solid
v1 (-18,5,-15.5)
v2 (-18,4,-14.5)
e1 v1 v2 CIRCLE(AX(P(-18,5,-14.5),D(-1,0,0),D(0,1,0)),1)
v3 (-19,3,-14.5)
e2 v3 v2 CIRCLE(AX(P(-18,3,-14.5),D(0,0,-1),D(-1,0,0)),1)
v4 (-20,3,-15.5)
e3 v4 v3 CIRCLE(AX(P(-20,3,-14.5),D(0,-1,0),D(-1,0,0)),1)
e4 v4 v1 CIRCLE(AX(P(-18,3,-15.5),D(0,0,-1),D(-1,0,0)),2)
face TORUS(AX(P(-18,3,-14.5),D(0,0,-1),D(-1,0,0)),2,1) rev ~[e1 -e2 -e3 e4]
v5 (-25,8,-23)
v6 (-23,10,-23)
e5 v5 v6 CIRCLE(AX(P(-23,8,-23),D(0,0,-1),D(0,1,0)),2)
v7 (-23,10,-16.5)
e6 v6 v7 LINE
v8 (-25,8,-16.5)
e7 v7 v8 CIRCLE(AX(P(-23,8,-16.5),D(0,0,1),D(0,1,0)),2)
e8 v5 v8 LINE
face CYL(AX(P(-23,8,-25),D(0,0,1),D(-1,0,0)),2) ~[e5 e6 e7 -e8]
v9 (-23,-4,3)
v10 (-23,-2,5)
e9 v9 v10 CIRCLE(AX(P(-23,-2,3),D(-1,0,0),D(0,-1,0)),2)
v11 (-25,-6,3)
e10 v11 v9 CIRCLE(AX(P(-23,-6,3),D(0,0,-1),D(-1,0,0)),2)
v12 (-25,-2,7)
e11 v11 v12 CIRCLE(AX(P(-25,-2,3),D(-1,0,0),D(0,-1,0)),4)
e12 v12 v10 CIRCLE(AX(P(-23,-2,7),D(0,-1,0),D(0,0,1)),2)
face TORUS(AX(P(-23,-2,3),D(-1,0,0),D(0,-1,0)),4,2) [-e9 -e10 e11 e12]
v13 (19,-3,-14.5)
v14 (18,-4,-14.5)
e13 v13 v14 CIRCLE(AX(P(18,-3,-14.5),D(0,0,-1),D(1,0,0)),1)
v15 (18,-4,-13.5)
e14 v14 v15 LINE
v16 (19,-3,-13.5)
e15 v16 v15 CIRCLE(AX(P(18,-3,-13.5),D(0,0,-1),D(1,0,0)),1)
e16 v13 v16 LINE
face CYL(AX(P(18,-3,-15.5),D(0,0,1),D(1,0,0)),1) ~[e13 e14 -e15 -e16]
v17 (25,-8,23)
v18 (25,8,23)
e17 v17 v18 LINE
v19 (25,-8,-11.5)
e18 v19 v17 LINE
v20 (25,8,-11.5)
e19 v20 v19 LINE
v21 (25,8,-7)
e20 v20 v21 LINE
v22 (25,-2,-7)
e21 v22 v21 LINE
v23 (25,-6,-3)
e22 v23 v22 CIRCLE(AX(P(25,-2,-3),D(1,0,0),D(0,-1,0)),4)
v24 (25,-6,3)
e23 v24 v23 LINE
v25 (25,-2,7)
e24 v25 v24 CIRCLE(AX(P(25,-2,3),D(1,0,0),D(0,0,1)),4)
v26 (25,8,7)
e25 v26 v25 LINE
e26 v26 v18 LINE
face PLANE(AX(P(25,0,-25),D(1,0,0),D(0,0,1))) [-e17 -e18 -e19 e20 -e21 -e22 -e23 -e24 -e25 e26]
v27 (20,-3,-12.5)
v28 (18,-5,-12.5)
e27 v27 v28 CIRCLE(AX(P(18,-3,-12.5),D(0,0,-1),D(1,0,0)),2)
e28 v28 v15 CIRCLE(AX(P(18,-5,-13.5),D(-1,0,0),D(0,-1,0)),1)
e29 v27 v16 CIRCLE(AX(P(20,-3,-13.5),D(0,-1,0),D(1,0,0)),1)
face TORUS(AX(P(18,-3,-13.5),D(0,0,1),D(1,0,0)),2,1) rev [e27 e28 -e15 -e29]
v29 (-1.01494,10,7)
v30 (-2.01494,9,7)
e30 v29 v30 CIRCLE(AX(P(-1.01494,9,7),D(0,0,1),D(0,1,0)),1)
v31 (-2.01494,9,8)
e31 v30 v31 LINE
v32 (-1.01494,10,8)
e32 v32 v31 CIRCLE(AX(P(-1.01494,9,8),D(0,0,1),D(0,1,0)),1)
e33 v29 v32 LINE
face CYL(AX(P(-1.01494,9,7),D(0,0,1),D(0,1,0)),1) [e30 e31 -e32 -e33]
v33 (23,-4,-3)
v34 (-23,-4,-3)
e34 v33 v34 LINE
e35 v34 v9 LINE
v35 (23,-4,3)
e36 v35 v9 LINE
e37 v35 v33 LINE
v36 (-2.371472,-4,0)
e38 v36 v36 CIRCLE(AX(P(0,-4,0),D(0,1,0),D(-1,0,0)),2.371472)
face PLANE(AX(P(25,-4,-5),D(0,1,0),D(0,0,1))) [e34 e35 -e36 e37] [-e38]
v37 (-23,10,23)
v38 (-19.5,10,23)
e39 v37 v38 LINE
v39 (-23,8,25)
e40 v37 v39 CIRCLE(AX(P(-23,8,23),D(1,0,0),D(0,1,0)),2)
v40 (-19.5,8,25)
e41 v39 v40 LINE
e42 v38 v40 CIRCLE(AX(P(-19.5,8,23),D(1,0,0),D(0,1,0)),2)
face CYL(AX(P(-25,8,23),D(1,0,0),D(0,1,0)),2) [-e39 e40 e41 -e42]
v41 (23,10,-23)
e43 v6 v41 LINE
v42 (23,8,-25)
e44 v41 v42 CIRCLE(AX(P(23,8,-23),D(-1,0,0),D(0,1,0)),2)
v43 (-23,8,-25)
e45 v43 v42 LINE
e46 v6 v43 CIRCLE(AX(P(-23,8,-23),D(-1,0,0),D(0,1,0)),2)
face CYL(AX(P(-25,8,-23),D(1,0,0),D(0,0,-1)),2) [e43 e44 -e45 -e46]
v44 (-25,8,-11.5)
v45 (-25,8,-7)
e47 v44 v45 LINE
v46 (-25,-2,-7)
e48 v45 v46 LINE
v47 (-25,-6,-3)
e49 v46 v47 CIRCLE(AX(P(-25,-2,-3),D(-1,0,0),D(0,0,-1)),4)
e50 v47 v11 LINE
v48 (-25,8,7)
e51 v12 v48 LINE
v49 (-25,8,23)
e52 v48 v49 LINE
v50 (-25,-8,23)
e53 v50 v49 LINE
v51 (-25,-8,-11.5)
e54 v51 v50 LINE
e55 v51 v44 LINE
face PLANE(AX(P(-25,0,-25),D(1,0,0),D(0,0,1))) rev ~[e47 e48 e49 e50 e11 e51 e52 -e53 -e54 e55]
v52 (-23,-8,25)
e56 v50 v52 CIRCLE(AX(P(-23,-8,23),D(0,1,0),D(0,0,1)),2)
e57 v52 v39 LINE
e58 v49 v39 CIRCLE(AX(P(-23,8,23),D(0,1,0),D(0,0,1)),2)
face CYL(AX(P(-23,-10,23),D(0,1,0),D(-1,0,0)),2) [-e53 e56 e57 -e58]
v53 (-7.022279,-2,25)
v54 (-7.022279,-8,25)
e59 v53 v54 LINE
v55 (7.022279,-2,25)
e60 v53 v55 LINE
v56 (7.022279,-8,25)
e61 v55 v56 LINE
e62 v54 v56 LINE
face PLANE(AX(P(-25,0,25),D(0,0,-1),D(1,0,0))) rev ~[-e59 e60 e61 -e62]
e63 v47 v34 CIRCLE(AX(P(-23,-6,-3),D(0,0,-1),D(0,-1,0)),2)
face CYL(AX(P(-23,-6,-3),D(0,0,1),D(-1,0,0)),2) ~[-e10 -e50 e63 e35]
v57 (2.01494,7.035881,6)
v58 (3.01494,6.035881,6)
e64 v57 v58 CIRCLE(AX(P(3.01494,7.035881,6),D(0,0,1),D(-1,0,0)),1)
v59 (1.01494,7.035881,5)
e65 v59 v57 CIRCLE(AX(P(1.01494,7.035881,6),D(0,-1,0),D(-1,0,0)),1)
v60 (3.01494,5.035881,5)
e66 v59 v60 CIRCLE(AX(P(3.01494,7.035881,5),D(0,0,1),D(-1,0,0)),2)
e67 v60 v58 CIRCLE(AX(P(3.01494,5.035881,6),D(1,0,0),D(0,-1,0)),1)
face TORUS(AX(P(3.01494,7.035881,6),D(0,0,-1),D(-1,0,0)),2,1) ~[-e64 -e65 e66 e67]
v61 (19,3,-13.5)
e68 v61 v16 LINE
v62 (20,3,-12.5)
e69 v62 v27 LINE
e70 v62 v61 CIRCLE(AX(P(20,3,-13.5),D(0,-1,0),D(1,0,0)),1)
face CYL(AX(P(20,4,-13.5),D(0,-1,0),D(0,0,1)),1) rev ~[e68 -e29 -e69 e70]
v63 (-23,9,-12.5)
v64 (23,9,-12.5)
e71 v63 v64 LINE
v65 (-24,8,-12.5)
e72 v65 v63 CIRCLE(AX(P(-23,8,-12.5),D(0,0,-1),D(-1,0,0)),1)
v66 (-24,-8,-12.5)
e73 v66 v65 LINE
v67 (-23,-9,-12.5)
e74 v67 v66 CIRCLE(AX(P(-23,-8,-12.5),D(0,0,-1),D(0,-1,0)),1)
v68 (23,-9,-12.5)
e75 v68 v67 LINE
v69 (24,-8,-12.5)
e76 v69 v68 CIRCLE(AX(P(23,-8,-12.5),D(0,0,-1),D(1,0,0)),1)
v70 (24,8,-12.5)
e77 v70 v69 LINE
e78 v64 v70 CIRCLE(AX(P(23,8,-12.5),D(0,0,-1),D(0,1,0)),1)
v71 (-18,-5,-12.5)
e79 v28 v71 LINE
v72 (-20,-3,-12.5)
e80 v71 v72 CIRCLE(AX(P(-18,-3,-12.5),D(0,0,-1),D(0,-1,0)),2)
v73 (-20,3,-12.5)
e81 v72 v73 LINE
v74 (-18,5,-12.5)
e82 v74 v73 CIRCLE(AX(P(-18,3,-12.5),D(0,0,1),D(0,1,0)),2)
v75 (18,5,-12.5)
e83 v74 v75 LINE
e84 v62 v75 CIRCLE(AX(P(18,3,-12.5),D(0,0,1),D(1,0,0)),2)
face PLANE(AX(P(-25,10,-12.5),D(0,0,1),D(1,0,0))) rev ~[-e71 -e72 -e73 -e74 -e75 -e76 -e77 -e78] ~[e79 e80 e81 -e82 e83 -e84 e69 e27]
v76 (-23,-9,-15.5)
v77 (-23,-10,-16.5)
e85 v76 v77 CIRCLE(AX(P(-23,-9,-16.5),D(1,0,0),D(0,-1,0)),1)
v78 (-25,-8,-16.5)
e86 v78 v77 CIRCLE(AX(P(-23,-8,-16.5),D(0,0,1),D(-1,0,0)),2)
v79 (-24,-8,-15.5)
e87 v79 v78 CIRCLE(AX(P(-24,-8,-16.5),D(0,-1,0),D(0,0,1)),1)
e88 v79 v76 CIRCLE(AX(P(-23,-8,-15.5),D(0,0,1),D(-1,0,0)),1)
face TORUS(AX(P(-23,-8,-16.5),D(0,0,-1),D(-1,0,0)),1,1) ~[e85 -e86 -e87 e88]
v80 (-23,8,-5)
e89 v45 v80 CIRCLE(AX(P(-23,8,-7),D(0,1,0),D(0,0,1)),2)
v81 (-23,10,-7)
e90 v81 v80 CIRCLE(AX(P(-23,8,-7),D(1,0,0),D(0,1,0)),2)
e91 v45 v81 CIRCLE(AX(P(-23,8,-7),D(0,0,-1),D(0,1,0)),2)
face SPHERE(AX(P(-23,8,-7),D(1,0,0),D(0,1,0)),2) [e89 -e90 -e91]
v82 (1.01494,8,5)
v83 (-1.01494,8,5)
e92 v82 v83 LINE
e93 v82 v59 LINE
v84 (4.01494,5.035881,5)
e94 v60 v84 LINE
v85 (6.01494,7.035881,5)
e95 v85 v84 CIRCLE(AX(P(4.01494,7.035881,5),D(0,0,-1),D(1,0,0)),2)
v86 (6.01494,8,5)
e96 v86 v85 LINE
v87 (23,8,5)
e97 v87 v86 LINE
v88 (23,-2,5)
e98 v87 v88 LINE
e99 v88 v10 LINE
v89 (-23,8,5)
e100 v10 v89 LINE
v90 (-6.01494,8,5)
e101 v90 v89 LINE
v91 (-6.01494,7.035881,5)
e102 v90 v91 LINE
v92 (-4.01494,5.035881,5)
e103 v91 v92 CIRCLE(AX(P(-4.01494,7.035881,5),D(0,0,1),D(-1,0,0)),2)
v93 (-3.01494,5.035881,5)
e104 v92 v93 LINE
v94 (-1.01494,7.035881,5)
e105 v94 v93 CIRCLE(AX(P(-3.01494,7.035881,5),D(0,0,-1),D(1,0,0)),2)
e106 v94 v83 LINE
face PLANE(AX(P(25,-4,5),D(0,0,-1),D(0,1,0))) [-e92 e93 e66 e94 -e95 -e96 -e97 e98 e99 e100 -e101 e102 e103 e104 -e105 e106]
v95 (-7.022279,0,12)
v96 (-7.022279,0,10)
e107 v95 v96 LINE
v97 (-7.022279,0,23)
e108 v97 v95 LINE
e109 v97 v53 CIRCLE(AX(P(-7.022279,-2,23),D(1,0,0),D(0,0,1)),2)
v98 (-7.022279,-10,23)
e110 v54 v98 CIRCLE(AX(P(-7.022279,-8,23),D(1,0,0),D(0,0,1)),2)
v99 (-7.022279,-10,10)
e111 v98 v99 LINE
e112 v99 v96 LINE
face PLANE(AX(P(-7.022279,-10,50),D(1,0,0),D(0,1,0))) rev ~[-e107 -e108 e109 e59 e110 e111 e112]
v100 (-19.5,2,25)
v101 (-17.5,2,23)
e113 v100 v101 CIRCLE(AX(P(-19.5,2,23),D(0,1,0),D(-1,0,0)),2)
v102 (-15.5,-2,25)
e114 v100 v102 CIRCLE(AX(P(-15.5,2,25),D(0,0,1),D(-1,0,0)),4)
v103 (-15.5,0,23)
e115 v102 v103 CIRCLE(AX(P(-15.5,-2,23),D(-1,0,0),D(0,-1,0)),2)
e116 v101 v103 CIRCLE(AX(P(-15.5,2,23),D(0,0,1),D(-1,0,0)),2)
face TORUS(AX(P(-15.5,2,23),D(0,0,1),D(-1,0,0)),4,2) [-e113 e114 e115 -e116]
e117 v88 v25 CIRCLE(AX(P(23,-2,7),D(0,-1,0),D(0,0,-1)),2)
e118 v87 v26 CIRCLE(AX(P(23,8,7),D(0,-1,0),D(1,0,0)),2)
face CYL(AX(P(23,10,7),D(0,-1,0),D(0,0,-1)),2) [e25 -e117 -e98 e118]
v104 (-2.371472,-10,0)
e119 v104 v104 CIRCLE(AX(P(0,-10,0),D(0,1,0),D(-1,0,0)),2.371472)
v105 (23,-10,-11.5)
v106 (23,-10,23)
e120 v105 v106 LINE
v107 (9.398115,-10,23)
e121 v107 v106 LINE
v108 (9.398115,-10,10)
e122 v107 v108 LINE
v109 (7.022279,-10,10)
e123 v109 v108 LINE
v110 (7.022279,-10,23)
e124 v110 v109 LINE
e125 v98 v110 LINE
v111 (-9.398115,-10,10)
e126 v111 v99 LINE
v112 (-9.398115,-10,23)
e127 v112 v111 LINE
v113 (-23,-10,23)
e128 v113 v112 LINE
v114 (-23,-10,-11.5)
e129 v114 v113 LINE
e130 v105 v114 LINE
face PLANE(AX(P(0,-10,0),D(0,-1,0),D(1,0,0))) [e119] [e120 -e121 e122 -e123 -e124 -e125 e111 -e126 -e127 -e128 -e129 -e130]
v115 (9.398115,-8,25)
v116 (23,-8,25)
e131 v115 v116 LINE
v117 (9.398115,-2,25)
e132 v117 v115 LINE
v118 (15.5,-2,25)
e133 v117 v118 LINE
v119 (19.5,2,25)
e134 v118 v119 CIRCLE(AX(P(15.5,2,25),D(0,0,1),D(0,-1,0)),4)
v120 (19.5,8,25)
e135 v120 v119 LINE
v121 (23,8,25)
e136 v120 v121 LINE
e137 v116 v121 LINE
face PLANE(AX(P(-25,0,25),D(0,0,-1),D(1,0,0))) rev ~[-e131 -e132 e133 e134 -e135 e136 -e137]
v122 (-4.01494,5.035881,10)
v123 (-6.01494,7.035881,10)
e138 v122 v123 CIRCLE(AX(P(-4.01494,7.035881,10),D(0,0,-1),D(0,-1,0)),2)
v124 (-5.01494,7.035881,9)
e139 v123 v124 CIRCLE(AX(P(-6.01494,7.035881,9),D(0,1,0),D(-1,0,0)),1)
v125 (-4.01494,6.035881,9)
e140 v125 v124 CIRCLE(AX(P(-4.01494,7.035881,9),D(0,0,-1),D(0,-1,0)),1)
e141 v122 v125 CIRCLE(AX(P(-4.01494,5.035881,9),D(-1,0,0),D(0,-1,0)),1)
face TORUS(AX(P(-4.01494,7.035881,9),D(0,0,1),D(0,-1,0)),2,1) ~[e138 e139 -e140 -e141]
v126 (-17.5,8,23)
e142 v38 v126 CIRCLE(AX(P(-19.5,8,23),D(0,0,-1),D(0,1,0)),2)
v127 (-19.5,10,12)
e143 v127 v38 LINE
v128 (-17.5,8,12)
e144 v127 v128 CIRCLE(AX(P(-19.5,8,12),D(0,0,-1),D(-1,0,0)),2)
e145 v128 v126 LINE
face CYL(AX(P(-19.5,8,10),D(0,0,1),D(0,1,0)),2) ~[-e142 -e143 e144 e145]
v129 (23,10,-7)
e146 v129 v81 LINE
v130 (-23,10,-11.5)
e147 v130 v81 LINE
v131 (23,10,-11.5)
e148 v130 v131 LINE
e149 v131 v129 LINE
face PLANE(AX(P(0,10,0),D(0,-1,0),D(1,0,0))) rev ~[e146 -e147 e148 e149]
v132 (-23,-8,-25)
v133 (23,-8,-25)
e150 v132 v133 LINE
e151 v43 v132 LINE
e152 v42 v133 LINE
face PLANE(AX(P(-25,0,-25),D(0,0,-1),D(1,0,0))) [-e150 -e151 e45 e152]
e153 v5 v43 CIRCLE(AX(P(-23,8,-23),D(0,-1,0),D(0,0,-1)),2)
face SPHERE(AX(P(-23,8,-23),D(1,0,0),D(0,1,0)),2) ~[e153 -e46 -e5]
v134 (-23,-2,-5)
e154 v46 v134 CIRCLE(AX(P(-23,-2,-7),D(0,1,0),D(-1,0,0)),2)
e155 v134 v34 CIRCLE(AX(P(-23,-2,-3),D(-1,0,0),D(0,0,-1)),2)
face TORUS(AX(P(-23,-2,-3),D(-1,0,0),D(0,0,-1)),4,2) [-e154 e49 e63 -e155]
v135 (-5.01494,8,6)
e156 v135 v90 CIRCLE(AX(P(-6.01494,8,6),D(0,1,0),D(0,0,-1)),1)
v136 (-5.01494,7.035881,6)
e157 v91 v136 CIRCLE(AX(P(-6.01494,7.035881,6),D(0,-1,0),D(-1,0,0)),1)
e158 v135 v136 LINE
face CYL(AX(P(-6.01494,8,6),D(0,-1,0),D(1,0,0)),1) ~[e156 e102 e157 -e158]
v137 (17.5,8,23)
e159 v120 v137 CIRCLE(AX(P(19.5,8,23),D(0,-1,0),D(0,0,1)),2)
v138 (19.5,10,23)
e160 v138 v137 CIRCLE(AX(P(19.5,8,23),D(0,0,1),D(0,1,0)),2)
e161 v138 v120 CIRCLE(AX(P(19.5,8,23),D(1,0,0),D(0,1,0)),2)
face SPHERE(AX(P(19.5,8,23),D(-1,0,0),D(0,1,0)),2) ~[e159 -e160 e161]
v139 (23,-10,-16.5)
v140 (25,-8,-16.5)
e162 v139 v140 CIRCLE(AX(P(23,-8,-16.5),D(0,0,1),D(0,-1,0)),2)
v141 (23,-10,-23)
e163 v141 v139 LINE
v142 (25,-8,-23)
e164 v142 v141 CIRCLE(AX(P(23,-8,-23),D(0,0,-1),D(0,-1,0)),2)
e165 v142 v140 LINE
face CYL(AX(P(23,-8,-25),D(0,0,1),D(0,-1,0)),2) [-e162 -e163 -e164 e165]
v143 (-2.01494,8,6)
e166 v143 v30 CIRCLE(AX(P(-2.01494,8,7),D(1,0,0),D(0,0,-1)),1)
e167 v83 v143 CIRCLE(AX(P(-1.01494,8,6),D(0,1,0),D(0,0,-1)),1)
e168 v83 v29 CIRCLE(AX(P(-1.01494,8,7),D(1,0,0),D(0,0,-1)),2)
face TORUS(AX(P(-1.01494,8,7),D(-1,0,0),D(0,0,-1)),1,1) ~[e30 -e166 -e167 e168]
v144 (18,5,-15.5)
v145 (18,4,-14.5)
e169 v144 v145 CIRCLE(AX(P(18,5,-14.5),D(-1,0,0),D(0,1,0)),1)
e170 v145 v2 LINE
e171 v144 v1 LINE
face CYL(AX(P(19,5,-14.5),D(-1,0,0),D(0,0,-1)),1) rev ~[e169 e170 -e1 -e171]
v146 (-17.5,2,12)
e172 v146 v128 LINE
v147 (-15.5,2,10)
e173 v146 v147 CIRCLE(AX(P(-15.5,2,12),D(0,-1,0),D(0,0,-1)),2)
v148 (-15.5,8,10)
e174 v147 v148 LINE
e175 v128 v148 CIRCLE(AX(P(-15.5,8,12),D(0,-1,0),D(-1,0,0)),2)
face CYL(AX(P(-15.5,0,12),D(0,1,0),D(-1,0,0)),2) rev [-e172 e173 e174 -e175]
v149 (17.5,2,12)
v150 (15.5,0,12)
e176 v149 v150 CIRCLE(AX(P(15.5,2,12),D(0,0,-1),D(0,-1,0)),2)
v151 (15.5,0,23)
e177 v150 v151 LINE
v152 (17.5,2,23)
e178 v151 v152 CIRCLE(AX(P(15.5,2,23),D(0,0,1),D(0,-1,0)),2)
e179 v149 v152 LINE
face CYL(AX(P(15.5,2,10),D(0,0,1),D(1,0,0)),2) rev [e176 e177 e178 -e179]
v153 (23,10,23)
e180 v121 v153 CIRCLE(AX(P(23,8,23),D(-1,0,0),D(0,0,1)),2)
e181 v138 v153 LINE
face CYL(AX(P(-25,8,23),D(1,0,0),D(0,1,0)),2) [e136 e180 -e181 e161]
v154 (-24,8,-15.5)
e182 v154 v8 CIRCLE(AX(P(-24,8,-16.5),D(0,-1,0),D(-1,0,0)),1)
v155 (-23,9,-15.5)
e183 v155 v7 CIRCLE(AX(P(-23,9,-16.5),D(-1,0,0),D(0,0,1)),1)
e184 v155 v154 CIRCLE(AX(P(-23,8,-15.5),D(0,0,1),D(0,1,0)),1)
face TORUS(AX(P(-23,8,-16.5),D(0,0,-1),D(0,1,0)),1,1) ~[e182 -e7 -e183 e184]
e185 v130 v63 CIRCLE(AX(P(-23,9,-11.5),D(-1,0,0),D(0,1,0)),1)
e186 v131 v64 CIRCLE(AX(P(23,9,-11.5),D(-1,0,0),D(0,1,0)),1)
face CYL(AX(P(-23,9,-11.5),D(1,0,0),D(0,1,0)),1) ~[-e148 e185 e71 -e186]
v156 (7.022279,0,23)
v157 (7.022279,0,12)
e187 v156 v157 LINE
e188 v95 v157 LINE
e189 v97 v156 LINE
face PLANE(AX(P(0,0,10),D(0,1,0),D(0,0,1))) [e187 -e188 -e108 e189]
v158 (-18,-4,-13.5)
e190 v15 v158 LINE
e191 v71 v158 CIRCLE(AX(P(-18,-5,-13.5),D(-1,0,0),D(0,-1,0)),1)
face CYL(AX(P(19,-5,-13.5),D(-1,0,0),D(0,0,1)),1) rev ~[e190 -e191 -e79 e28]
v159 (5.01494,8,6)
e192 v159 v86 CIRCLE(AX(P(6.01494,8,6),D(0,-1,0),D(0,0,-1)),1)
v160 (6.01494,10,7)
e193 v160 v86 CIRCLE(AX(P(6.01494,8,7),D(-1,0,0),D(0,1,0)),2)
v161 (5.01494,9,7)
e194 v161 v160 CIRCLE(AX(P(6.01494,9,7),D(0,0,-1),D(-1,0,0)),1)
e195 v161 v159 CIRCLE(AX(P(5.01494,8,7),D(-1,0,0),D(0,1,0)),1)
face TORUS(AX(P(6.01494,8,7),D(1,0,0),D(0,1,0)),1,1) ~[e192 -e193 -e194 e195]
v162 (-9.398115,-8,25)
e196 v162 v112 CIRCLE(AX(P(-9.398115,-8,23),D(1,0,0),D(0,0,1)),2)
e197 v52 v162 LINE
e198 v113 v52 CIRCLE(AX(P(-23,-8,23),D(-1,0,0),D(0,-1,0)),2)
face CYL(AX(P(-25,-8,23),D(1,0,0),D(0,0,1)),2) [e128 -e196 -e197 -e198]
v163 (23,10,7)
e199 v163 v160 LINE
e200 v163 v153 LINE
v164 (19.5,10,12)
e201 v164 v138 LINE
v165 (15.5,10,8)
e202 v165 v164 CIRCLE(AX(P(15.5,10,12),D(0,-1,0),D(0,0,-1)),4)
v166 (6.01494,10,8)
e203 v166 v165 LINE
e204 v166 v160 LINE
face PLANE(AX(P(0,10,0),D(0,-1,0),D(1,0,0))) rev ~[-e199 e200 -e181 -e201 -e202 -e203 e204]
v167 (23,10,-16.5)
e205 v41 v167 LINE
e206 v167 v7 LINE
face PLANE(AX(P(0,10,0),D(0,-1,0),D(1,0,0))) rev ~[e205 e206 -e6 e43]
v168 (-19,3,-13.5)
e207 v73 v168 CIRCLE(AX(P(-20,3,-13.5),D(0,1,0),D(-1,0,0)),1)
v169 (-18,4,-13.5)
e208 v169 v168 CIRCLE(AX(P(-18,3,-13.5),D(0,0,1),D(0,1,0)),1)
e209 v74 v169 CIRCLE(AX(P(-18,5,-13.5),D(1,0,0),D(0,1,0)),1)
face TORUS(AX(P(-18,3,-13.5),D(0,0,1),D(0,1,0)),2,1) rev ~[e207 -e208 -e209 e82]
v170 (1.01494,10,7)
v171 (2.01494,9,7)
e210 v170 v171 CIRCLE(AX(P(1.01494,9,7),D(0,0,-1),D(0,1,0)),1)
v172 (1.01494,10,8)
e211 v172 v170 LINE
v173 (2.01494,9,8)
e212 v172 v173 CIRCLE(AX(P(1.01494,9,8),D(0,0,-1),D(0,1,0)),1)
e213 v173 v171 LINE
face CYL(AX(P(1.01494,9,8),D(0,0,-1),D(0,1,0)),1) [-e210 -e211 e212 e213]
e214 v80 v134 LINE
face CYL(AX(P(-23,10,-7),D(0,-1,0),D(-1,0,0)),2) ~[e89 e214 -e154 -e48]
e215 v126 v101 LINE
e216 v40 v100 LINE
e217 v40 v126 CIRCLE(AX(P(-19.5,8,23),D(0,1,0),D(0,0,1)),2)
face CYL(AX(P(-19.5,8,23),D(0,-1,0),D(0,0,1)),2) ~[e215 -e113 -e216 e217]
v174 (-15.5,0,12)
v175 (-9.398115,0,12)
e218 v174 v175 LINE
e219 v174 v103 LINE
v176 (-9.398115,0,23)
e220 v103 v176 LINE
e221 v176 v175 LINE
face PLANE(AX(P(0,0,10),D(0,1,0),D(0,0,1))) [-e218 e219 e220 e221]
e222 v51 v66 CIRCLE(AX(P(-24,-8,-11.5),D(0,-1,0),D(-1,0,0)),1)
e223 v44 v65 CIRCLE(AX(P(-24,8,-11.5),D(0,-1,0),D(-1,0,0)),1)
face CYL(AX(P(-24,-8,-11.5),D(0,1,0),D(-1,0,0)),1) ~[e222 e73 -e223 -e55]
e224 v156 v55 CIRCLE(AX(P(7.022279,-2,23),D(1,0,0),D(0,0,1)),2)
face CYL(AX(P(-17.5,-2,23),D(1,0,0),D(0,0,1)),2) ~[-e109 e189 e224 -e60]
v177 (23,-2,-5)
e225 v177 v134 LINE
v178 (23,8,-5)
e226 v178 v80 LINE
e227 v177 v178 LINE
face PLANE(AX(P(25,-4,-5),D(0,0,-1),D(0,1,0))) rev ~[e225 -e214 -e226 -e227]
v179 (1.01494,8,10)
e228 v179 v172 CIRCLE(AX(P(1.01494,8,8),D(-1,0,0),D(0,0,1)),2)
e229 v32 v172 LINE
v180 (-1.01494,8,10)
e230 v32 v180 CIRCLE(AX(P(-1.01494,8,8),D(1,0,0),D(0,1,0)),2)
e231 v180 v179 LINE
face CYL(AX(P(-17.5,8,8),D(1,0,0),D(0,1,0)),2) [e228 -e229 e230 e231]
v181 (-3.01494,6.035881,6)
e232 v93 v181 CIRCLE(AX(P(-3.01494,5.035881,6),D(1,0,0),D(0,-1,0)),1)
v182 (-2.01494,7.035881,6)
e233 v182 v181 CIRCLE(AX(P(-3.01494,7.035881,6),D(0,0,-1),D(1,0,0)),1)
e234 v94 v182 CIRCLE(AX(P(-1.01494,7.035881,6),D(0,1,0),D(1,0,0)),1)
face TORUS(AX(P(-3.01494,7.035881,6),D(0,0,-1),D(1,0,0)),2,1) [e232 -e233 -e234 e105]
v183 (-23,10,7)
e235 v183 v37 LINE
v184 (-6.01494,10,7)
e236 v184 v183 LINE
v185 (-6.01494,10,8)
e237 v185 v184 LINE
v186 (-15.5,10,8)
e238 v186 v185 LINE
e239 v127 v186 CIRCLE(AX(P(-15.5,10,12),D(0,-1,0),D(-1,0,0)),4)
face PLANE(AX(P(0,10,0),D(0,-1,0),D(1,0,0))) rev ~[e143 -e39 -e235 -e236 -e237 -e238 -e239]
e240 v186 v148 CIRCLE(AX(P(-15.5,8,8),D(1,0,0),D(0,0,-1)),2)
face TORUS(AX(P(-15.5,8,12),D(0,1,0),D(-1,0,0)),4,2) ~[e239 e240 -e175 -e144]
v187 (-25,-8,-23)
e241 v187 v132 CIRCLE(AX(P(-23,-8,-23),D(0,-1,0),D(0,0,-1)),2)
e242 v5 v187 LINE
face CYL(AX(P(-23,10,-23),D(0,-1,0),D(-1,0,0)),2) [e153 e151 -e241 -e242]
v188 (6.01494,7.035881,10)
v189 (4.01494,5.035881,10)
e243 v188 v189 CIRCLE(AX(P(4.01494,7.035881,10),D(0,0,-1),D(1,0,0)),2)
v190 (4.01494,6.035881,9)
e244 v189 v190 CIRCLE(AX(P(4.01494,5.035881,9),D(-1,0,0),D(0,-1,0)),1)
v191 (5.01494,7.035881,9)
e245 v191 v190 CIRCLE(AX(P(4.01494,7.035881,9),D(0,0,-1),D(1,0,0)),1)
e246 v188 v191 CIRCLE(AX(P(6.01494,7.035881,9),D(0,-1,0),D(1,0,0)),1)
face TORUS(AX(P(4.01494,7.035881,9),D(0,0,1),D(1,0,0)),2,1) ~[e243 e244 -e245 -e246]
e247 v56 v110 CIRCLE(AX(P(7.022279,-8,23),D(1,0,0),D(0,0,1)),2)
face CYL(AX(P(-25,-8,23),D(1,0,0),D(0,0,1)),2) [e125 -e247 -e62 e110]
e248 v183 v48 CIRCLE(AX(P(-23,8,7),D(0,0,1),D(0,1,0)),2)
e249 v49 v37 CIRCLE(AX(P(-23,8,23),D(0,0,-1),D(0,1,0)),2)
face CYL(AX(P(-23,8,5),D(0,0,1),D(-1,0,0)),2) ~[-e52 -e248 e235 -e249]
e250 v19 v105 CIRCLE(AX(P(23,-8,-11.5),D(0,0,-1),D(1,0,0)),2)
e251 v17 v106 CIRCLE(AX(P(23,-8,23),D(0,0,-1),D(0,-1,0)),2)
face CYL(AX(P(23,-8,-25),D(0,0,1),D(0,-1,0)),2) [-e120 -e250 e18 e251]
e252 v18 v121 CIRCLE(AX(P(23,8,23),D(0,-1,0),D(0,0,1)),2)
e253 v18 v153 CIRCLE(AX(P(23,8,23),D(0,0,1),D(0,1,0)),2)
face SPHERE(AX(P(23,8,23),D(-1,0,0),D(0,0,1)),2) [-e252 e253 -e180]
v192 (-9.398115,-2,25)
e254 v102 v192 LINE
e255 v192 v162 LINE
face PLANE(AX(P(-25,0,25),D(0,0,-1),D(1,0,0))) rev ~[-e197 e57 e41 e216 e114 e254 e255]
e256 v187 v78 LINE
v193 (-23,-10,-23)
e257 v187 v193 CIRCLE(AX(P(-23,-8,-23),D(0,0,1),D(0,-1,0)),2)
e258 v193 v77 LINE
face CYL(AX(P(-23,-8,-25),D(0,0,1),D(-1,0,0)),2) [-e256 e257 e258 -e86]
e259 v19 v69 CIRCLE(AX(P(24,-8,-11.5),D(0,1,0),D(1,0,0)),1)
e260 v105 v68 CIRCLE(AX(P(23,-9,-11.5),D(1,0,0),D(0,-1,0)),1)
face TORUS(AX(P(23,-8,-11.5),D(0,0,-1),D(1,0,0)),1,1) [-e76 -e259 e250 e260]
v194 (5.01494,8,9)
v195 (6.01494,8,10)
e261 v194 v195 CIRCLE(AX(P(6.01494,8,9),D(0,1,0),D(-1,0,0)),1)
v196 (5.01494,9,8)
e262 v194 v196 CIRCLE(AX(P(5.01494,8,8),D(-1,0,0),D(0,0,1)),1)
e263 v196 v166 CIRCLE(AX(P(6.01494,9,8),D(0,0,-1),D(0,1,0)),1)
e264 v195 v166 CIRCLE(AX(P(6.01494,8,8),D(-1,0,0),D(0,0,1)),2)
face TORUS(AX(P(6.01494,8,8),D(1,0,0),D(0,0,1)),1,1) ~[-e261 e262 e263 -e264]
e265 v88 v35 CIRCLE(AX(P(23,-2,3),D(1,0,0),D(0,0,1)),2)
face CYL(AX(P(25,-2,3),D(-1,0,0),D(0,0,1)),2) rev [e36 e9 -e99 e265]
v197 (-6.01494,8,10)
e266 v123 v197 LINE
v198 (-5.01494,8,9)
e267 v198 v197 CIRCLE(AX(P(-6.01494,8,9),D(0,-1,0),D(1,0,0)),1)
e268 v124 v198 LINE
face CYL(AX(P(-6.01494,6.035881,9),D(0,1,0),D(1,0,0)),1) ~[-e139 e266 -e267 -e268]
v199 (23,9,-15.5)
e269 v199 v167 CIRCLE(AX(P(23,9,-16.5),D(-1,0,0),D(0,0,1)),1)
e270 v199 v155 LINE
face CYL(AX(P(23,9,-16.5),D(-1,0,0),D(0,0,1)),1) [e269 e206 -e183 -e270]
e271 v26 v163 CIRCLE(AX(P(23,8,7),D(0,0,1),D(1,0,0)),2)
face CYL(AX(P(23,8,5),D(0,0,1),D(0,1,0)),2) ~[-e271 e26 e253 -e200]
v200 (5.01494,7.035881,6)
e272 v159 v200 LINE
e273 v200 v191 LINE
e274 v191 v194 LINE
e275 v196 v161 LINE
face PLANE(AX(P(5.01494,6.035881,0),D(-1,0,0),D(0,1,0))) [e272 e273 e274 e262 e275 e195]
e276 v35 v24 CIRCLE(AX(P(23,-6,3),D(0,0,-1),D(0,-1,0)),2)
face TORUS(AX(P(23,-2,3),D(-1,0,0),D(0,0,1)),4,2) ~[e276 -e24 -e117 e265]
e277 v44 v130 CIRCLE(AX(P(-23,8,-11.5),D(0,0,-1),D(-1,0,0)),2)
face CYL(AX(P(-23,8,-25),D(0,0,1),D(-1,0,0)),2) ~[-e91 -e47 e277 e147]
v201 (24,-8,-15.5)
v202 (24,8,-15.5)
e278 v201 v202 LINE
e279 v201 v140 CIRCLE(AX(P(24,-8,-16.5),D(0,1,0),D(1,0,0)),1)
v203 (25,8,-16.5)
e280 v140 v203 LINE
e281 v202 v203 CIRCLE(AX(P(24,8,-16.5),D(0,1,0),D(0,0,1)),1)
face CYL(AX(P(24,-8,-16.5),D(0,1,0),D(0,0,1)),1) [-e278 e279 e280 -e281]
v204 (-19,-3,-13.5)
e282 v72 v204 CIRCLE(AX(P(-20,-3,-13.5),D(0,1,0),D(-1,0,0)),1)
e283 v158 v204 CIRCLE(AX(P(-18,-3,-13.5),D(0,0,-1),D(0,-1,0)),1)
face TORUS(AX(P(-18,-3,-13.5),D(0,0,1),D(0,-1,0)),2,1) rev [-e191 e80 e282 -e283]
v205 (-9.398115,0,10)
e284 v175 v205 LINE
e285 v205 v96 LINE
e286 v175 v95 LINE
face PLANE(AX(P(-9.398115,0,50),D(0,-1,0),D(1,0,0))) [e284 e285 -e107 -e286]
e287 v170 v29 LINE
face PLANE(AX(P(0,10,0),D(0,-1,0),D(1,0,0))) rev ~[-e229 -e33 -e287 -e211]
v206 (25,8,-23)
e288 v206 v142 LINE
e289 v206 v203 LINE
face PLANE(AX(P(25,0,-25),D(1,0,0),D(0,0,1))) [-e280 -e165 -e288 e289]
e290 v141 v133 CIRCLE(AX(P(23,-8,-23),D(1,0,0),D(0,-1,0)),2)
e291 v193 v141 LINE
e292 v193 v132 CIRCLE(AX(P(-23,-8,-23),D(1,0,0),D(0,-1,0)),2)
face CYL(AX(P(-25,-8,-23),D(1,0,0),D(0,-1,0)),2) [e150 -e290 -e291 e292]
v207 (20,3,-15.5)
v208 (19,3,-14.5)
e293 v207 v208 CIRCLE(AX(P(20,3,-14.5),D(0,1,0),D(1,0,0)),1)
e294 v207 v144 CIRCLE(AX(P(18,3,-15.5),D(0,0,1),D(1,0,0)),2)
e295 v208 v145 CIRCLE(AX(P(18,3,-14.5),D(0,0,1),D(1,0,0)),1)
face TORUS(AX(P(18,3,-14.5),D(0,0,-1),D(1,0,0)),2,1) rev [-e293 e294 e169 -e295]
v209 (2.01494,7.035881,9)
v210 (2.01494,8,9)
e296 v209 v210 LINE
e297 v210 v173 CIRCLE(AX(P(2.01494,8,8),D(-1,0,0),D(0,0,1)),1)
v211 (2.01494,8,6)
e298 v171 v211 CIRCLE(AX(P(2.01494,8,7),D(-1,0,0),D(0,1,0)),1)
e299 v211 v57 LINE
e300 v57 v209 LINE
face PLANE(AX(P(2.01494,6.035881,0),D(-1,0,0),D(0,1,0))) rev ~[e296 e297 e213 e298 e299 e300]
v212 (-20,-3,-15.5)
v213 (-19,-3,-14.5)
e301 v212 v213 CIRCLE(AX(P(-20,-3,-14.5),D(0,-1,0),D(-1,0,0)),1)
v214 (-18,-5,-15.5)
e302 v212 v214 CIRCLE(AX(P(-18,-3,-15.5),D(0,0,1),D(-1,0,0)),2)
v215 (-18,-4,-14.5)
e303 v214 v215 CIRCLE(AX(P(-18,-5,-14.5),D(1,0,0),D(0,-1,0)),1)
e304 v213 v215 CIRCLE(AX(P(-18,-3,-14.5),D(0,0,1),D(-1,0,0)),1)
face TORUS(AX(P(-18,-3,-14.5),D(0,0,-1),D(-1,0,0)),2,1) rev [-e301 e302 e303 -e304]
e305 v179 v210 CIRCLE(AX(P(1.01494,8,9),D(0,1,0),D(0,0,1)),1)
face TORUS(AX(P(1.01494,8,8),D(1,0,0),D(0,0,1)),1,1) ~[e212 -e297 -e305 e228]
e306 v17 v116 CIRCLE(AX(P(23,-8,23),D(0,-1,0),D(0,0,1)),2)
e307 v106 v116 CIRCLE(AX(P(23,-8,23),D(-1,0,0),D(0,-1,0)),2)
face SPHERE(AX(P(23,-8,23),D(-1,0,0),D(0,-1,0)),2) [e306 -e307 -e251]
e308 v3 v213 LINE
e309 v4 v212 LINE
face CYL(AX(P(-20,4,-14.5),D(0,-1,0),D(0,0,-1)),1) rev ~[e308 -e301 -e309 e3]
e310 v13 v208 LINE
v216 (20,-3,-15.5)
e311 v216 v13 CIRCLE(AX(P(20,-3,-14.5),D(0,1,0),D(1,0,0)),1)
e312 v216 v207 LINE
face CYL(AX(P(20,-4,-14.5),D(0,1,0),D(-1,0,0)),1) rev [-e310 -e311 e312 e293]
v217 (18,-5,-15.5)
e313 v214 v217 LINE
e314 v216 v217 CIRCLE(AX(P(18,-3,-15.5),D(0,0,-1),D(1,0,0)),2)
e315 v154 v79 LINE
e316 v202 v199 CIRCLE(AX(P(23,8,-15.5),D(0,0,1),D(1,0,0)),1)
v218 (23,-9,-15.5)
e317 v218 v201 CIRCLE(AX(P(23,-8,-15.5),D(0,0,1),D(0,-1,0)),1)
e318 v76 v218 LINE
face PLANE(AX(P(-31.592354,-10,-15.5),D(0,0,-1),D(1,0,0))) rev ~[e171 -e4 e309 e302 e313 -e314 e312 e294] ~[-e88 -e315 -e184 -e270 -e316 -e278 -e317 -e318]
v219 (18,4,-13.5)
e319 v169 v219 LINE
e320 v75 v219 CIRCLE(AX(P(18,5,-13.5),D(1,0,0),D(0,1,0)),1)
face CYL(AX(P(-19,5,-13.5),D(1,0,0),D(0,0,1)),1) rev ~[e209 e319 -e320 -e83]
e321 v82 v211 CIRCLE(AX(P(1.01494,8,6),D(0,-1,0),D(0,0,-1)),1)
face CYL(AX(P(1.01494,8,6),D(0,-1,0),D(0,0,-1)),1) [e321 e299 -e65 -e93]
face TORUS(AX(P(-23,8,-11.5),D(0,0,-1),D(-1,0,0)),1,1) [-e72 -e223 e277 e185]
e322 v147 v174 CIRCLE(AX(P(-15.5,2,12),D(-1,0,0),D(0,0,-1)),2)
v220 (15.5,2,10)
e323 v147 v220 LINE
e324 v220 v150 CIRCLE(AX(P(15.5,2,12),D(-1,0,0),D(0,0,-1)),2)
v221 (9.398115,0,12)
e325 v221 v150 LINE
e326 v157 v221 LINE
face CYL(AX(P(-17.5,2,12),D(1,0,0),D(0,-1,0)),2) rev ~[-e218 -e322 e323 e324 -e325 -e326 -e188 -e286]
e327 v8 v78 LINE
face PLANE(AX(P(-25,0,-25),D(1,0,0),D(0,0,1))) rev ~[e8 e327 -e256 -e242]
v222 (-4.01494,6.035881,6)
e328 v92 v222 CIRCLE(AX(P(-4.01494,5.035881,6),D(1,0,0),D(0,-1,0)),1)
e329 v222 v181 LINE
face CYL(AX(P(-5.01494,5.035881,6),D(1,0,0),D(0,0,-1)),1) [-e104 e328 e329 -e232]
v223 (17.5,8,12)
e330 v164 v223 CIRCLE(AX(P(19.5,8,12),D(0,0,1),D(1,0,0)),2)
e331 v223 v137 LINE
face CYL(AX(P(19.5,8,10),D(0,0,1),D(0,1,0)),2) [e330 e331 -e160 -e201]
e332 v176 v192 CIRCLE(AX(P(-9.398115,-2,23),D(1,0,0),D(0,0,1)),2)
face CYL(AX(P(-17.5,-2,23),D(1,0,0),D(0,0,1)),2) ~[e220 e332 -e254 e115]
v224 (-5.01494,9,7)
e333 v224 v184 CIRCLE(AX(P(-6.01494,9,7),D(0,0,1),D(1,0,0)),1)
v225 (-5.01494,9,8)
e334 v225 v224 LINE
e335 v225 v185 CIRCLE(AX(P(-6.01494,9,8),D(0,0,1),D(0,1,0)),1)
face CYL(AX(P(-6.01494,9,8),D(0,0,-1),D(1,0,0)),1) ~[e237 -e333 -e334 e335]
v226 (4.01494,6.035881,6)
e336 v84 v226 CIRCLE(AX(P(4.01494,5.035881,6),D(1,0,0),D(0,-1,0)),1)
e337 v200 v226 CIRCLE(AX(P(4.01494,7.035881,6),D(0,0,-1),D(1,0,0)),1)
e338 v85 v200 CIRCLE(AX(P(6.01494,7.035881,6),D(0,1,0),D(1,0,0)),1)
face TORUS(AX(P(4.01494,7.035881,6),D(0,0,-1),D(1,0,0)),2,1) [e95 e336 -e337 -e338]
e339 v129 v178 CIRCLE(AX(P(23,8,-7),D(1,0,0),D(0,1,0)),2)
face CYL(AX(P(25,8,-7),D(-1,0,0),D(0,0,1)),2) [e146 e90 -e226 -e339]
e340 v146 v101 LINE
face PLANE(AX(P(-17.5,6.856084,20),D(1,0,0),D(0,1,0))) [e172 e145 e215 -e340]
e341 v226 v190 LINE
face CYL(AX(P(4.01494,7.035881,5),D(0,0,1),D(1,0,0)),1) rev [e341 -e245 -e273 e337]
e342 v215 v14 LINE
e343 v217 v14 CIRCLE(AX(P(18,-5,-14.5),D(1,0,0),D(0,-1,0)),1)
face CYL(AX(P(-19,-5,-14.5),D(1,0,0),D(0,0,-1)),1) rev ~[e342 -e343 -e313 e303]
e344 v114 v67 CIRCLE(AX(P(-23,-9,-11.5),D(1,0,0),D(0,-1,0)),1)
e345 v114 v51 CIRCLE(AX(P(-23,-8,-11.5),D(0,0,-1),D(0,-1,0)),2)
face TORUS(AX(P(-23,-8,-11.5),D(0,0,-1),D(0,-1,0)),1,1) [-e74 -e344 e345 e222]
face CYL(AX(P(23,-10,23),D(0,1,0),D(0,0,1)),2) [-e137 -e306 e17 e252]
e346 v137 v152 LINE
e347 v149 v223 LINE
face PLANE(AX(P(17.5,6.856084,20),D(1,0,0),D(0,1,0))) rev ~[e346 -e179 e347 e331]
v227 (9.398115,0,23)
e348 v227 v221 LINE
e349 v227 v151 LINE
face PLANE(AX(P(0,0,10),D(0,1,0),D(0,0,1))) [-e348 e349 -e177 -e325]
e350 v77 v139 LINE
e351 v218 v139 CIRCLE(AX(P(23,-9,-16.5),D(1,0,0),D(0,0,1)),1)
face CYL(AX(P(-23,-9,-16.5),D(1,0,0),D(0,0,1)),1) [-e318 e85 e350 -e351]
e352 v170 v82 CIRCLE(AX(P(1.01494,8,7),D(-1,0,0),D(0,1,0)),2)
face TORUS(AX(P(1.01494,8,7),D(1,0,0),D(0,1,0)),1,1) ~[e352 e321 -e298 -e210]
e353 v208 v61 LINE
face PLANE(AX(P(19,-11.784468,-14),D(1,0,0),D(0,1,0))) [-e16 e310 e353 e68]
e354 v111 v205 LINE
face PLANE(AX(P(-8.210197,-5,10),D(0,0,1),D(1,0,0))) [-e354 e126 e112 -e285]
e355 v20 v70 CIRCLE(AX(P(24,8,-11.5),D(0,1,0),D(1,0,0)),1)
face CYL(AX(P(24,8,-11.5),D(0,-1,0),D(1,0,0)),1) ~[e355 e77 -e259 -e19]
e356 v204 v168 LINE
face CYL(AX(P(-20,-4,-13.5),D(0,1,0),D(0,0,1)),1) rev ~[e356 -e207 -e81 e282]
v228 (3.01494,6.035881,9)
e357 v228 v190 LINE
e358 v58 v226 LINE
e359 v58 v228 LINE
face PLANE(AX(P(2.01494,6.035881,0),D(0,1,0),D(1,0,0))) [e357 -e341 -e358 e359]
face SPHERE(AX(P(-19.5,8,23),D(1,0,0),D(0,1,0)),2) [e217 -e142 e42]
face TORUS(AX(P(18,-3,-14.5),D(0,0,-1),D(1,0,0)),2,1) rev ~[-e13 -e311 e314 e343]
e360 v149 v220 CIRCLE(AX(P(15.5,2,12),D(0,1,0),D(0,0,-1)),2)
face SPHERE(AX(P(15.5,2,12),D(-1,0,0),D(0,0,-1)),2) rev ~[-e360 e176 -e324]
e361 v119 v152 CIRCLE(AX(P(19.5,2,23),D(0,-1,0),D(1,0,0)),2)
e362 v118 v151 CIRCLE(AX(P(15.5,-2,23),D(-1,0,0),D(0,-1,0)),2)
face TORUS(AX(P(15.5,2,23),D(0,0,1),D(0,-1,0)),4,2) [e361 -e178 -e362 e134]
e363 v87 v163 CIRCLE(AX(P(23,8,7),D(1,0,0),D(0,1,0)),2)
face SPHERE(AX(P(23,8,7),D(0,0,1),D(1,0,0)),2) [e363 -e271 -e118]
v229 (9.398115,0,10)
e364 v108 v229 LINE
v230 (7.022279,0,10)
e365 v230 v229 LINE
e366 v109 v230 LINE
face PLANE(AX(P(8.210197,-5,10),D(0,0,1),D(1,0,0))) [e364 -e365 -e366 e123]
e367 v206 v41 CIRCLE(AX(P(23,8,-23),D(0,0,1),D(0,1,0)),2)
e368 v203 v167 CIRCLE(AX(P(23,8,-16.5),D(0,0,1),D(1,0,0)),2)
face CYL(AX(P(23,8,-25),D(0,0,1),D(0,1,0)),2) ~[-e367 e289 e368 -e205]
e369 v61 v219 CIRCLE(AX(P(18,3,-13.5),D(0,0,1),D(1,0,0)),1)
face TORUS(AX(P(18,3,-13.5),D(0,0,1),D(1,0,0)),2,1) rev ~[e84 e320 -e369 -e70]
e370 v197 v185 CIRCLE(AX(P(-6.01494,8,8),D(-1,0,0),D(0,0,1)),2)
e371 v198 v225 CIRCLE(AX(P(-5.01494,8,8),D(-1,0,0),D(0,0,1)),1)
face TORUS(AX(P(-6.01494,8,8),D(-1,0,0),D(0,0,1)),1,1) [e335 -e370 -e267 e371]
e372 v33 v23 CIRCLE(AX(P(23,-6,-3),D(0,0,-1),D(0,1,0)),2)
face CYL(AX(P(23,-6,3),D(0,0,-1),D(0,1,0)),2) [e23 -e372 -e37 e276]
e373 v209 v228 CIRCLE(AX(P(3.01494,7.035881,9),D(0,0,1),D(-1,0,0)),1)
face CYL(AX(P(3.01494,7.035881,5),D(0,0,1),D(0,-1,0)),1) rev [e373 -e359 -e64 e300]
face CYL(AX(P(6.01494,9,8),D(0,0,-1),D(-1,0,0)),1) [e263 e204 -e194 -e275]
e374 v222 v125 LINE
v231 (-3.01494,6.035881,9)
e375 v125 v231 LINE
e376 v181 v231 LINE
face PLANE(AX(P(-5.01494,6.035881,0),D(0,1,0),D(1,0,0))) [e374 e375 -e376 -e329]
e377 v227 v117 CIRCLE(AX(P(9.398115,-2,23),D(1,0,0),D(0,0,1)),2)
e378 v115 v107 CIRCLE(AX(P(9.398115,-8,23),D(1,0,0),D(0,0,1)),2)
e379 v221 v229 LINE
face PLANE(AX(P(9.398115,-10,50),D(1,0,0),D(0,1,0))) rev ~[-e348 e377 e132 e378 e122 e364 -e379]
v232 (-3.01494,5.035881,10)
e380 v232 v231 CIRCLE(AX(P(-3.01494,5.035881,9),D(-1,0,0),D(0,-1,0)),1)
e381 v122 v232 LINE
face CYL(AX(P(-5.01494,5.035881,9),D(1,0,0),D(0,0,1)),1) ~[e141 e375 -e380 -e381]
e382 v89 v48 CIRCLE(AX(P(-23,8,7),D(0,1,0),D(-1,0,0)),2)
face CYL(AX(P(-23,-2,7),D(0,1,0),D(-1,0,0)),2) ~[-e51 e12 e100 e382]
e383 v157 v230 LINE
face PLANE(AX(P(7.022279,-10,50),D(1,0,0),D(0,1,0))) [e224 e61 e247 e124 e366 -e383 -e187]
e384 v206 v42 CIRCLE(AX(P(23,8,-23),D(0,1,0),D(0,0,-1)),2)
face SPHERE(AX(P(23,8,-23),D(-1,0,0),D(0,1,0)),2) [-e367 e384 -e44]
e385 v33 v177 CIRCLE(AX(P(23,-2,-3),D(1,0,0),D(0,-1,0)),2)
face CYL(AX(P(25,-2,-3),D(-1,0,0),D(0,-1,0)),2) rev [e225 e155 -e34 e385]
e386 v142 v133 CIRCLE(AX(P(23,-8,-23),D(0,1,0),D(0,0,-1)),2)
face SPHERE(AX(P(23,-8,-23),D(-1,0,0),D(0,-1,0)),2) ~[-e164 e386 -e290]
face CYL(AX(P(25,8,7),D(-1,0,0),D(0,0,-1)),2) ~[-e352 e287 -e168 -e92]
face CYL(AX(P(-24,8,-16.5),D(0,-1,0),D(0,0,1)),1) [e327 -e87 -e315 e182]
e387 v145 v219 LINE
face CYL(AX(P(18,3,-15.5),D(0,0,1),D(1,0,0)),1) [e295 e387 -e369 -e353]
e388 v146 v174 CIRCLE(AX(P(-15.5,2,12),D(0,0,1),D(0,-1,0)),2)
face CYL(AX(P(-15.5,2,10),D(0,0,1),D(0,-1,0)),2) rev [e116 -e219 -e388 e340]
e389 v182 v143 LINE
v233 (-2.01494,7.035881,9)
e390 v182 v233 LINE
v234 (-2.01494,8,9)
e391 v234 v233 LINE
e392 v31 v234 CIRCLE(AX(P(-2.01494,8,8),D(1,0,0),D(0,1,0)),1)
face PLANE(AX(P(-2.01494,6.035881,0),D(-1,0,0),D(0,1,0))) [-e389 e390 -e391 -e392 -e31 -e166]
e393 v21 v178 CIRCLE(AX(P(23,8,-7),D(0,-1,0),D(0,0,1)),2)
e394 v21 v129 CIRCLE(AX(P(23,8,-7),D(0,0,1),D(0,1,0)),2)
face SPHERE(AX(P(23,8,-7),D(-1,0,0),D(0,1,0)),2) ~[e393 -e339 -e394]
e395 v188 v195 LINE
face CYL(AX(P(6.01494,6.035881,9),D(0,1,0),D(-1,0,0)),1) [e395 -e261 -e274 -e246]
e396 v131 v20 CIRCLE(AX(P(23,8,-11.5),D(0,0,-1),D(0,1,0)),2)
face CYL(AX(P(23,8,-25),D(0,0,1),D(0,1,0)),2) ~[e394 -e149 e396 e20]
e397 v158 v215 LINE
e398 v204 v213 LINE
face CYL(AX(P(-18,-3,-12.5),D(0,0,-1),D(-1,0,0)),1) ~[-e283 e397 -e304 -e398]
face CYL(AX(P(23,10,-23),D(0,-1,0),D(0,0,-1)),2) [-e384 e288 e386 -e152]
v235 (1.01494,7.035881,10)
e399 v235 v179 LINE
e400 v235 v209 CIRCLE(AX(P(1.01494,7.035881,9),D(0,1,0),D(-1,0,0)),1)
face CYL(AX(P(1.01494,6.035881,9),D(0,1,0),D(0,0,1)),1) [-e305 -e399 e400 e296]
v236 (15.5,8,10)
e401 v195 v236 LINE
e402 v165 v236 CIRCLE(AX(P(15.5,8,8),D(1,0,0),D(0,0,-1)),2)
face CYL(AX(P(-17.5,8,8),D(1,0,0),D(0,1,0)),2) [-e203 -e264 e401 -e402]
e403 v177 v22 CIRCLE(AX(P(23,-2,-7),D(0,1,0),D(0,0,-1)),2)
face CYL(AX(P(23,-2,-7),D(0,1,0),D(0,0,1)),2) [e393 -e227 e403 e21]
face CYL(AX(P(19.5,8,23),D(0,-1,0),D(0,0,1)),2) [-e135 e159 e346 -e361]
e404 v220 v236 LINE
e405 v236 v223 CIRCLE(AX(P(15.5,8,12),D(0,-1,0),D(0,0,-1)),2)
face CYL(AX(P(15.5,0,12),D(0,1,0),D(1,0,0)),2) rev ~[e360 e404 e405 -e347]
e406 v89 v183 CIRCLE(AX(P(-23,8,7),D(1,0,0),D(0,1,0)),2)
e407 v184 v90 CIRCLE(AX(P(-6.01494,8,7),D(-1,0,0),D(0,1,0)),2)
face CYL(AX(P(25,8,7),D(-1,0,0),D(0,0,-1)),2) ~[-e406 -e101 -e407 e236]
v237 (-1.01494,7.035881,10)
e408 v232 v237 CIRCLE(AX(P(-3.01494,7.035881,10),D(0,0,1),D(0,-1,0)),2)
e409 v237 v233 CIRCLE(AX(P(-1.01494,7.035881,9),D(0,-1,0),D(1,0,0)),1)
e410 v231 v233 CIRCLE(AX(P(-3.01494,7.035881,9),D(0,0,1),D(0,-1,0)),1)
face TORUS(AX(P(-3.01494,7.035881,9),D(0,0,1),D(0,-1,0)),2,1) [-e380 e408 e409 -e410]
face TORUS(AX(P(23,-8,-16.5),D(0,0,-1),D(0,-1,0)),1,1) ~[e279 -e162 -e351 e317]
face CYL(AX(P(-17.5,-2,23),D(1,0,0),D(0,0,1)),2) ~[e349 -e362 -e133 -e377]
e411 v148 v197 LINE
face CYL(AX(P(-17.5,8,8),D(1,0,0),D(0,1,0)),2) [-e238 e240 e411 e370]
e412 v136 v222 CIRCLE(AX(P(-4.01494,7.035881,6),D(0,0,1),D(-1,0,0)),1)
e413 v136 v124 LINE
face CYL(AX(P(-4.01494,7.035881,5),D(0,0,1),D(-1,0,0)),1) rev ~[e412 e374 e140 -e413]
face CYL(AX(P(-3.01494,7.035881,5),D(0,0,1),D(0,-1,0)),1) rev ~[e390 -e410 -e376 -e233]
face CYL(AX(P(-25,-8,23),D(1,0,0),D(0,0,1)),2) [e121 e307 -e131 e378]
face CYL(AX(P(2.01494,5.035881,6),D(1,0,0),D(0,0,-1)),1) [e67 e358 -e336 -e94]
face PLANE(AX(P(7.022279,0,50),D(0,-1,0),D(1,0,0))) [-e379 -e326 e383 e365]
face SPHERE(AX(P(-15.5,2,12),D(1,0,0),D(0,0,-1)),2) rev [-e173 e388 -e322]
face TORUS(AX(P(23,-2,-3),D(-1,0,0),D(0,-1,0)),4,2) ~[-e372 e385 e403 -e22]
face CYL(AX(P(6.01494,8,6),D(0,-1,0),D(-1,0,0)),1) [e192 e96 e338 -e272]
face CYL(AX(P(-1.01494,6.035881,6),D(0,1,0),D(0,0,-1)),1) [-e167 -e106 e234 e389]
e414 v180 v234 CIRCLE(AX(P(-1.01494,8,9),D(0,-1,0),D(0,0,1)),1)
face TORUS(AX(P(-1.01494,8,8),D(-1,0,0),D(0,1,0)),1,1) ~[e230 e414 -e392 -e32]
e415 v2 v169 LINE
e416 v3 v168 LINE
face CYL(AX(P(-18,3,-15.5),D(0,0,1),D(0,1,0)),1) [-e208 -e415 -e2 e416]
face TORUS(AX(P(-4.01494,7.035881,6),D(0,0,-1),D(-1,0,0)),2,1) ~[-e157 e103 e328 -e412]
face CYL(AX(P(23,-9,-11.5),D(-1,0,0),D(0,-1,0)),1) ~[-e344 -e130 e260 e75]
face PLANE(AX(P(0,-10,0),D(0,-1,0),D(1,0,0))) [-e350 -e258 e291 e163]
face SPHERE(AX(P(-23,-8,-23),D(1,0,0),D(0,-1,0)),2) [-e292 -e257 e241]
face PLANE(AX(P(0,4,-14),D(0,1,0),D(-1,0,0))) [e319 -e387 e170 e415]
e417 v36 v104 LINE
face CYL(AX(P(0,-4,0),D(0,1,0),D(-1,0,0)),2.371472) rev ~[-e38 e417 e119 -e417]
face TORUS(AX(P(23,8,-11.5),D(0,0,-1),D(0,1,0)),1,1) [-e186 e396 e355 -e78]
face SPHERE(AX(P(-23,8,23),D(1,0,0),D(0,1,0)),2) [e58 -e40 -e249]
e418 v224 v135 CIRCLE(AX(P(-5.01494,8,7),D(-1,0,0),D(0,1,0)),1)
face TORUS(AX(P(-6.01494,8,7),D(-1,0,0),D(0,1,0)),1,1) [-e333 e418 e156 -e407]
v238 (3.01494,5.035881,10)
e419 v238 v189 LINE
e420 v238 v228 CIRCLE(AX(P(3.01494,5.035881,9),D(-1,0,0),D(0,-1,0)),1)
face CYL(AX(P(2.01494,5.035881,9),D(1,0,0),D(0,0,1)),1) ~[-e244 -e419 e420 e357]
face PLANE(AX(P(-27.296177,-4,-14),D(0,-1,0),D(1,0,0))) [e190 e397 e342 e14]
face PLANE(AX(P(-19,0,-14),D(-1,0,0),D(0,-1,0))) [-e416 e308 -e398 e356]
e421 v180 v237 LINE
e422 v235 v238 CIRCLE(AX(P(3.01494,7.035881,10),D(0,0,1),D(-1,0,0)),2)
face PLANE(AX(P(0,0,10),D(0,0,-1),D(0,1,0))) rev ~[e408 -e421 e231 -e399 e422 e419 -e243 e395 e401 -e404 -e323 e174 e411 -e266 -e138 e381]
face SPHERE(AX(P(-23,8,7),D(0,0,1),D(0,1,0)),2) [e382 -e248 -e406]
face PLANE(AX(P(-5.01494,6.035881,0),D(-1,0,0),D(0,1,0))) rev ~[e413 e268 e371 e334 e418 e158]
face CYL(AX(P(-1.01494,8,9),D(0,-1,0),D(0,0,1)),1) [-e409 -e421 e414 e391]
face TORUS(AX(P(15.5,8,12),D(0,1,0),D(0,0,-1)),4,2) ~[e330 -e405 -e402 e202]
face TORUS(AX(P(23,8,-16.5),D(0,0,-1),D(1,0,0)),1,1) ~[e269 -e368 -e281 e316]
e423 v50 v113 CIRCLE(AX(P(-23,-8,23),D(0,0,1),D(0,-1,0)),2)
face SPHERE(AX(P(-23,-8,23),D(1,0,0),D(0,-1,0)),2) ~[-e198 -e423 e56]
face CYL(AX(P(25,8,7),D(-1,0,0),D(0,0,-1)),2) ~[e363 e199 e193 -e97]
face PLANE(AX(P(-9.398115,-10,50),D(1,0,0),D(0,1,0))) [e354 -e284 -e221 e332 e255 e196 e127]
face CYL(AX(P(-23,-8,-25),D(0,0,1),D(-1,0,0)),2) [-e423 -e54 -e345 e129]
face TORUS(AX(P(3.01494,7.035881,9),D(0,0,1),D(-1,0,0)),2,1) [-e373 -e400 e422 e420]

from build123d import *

# Parameters (mm, degrees)
F0_W      = 50
F0_H      = 50
F1_DEPTH  = 10
F2_W      = 14
F2_H      = 10
F3_DEPTH  = 76.70555
F4_F1_R   = 2
F4_F2_R   = 2
F5_W      = 13.7121686712
F5_H      = 20
F6_DEPTH  = 17.5
F7_R      = 2
F8_W      = 3
F8_H      = 5.7575751543
F9_DEPTH  = 29.7216
F10_R     = 1
F11_W     = 46
F11_H     = 3
F11_W_2   = 2
F12_DEPTH = 6
F13_W     = 7.5689357519
F13_H     = 3
F13_W_2   = 12
F14_DEPTH = 6
F15_W     = 8.5923536867
F15_H     = 3
F15_W_2   = 42
F16_DEPTH = 6
F17_W     = 8
F17_H     = 3
F18_DEPTH = 6
F19_R     = 1
F20_R     = 2.3714715185
F21_DEPTH = 25
F23_W     = 2.3758355528
F23_H     = 10
F24_DEPTH = 40


with BuildPart() as f1:
    # F0 (on Front) → F1 (new body, symmetric)
    with BuildSketch(Plane.XZ):
        Rectangle(F0_W, F0_H)
    extrude(amount=F1_DEPTH, both=True)

    # F2 (on face) → F3 (cut)
    with BuildSketch(Plane.YZ.offset(25)):
        with Locations((3, 0)):
            Rectangle(F2_W, F2_H)
    extrude(amount=-F3_DEPTH, mode=Mode.SUBTRACT)

    # F4: fillet of radius 2 on 20 edges, made by hand

    # F4_f1
    f4_f1_edges = [f1.edges().sort_by_distance(p)[0] for p in [
        (0, -4, -5),
        (0, -4, 5),
    ]]
    fillet(f4_f1_edges, radius=F4_F1_R)

    # F4_f2
    f4_f2_edges = [f1.edges().sort_by_distance(p)[0] for p in [
        (0, 10, 25),
        (0, -10, 25),
        (0, 10, -5),
        (0, 10, -25),
        (0, -10, -25),
        (25, -10, 0),
        (25, 10, -15),
        (-25, 10, -15),
        (-25, -10, 0),
        (-25, 10, 15),
        (-25, 0, 25),
        (25, 0, 25),
        (25, 10, 15),
        (25, 4, -5),
        (0, 10, 5),
        (-25, 4, 5),
        (-25, 0, -25),
        (25, 0, -25),
        (-25, -3.4142135624, 4.4142135624),
        (25, -3.4142135624, -4.4142135624),
    ]]
    fillet(f4_f2_edges, radius=F4_F2_R)

    # F5 (on Right) → F6 (cut, symmetric)
    with BuildSketch(Plane.YZ):
        with Locations((6.8560843356, 20)):
            Rectangle(F5_W, F5_H)
    extrude(amount=F6_DEPTH, both=True, mode=Mode.SUBTRACT)

    # F7
    f7_edges = [f1.edges().sort_by_distance(p)[0] for p in [
        (0, 0, 10),
        (0, 0, 25),
        (17.5, 4, 25),
        (17.5, 5, 10),
        (0, 10, 10),
        (-17.5, 5, 10),
        (-17.5, 0, 17.5),
        (17.5, 0, 17.5),
        (-17.5, 10, 16.5),
        (17.5, 10, 16.5),
        (-17.5, 9.414214, 24.414214),
        (17.5, 9.414214, 24.414214),
    ]]
    fillet(f7_edges, radius=F7_R)

    # F8 (on Top) → F9 (cut)
    with BuildSketch(Plane.XY):
        with Locations((3.5149400131, 8.914668113)):
            Rectangle(F8_W, F8_H)
        with Locations((-3.5149400131, 8.914668113)):
            Rectangle(F8_W, F8_H)
    extrude(amount=F9_DEPTH, mode=Mode.SUBTRACT)

    # F10
    f10_edges = [f1.edges().sort_by_distance(p)[0] for p in [
        (3.51494, 6.035881, 10),
        (2.01494, 6.035881, 7.5),
        (2.01494, 7.01794, 10),
        (-3.51494, 6.035881, 10),
        (-5.01494, 7.01794, 10),
        (3.51494, 6.035881, 5),
        (5.01494, 6.035881, 7.5),
        (5.01494, 9.414214, 5.585786),
        (-2.01494, 7.01794, 5),
        (-3.51494, 6.035881, 5),
        (-2.01494, 6.035881, 7.5),
        (-5.01494, 6.035881, 7.5),
    ]]
    fillet(f10_edges, radius=F10_R)

    # F11 (on face) → F12 (cut)
    with BuildSketch(Plane(origin=(0, 10, 0), x_dir=(-1, 0, 0), z_dir=(0, 1, 0))):
        with Locations((0, -14)):
            Rectangle(F11_W, F11_H)
        with Locations((-24, -14)):
            Rectangle(F11_W_2, F11_H)
        with Locations((24, -14)):
            Rectangle(F11_W_2, F11_H)
    extrude(amount=-F12_DEPTH, mode=Mode.SUBTRACT)

    # F13 (on face) → F14 (cut)
    with BuildSketch(Plane.YZ.offset(25)):
        with Locations((-11.784467876, -14)):
            Rectangle(F13_W, F13_H)
        with Locations((-2, -14)):
            Rectangle(F13_W_2, F13_H)
    extrude(amount=-F14_DEPTH, mode=Mode.SUBTRACT)

    # F15 (on face) → F16 (cut)
    with BuildSketch(Plane.XZ.offset(10)):
        with Locations((-27.2961768433, -14)):
            Rectangle(F15_W, F15_H)
        with Locations((-2, -14)):
            Rectangle(F15_W_2, F15_H)
    extrude(amount=-F16_DEPTH, mode=Mode.SUBTRACT)

    # F17 (on face) → F18 (cut)
    with BuildSketch(Plane(origin=(-25, 0, 0), x_dir=(0, -1, 0), z_dir=(-1, 0, 0))):
        with Locations((0, -14)):
            Rectangle(F17_W, F17_H)
        Polygon((8, -12.5), (4, -12.5), (4, -15.5), (8, -15.5), (13.1623027846, -15.5), (13.1623027846, -12.5), align=None)
    extrude(amount=-F18_DEPTH, mode=Mode.SUBTRACT)

    # F19
    f19_edges = [f1.edges().sort_by_distance(p)[0] for p in [
        (0, 10, -15.5),
        (0, 4, -15.5),
        (19, 0, -12.5),
        (0, 4, -12.5),
        (0, 10, -12.5),
        (24.414214, 9.414214, -12.5),
        (25, 0, -12.5),
        (19, 4, -14),
        (19, 0, -15.5),
        (25, 0, -15.5),
        (24.414214, 9.414214, -15.5),
        (24.414214, -9.414214, -15.5),
        (0, -4, -15.5),
        (0, -10, -15.5),
        (0, -4, -12.5),
        (0, -10, -12.5),
        (-19, 0, -12.5),
        (-25, 0, -12.5),
        (-24.414214, -9.414214, -12.5),
        (-19, -4, -14),
        (-19, 4, -14),
        (-19, 0, -15.5),
        (-24.414214, 9.414214, -15.5),
        (-25, 0, -15.5),
        (-24.414214, -9.414214, -15.5),
        (-24.414214, 9.414214, -12.5),
        (19, -4, -14),
        (24.414214, -9.414214, -12.5),
    ]]
    fillet(f19_edges, radius=F19_R)

    # F20 (on face) → F21 (cut)
    with BuildSketch(Plane(origin=(0, -4, 0), x_dir=(-1, 0, 0), z_dir=(0, 1, 0))):
        Circle(F20_R)
    extrude(amount=-F21_DEPTH, mode=Mode.SUBTRACT)

    # F23 (on offset) → F24 (cut)
    with BuildSketch(Plane.XY.offset(50)):
        with Locations((8.2101970911, -5)):
            Rectangle(F23_W, F23_H)
        with Locations((-8.2101970911, -5)):
            Rectangle(F23_W, F23_H)
    extrude(amount=-F24_DEPTH, mode=Mode.SUBTRACT)


solid = f1.part
